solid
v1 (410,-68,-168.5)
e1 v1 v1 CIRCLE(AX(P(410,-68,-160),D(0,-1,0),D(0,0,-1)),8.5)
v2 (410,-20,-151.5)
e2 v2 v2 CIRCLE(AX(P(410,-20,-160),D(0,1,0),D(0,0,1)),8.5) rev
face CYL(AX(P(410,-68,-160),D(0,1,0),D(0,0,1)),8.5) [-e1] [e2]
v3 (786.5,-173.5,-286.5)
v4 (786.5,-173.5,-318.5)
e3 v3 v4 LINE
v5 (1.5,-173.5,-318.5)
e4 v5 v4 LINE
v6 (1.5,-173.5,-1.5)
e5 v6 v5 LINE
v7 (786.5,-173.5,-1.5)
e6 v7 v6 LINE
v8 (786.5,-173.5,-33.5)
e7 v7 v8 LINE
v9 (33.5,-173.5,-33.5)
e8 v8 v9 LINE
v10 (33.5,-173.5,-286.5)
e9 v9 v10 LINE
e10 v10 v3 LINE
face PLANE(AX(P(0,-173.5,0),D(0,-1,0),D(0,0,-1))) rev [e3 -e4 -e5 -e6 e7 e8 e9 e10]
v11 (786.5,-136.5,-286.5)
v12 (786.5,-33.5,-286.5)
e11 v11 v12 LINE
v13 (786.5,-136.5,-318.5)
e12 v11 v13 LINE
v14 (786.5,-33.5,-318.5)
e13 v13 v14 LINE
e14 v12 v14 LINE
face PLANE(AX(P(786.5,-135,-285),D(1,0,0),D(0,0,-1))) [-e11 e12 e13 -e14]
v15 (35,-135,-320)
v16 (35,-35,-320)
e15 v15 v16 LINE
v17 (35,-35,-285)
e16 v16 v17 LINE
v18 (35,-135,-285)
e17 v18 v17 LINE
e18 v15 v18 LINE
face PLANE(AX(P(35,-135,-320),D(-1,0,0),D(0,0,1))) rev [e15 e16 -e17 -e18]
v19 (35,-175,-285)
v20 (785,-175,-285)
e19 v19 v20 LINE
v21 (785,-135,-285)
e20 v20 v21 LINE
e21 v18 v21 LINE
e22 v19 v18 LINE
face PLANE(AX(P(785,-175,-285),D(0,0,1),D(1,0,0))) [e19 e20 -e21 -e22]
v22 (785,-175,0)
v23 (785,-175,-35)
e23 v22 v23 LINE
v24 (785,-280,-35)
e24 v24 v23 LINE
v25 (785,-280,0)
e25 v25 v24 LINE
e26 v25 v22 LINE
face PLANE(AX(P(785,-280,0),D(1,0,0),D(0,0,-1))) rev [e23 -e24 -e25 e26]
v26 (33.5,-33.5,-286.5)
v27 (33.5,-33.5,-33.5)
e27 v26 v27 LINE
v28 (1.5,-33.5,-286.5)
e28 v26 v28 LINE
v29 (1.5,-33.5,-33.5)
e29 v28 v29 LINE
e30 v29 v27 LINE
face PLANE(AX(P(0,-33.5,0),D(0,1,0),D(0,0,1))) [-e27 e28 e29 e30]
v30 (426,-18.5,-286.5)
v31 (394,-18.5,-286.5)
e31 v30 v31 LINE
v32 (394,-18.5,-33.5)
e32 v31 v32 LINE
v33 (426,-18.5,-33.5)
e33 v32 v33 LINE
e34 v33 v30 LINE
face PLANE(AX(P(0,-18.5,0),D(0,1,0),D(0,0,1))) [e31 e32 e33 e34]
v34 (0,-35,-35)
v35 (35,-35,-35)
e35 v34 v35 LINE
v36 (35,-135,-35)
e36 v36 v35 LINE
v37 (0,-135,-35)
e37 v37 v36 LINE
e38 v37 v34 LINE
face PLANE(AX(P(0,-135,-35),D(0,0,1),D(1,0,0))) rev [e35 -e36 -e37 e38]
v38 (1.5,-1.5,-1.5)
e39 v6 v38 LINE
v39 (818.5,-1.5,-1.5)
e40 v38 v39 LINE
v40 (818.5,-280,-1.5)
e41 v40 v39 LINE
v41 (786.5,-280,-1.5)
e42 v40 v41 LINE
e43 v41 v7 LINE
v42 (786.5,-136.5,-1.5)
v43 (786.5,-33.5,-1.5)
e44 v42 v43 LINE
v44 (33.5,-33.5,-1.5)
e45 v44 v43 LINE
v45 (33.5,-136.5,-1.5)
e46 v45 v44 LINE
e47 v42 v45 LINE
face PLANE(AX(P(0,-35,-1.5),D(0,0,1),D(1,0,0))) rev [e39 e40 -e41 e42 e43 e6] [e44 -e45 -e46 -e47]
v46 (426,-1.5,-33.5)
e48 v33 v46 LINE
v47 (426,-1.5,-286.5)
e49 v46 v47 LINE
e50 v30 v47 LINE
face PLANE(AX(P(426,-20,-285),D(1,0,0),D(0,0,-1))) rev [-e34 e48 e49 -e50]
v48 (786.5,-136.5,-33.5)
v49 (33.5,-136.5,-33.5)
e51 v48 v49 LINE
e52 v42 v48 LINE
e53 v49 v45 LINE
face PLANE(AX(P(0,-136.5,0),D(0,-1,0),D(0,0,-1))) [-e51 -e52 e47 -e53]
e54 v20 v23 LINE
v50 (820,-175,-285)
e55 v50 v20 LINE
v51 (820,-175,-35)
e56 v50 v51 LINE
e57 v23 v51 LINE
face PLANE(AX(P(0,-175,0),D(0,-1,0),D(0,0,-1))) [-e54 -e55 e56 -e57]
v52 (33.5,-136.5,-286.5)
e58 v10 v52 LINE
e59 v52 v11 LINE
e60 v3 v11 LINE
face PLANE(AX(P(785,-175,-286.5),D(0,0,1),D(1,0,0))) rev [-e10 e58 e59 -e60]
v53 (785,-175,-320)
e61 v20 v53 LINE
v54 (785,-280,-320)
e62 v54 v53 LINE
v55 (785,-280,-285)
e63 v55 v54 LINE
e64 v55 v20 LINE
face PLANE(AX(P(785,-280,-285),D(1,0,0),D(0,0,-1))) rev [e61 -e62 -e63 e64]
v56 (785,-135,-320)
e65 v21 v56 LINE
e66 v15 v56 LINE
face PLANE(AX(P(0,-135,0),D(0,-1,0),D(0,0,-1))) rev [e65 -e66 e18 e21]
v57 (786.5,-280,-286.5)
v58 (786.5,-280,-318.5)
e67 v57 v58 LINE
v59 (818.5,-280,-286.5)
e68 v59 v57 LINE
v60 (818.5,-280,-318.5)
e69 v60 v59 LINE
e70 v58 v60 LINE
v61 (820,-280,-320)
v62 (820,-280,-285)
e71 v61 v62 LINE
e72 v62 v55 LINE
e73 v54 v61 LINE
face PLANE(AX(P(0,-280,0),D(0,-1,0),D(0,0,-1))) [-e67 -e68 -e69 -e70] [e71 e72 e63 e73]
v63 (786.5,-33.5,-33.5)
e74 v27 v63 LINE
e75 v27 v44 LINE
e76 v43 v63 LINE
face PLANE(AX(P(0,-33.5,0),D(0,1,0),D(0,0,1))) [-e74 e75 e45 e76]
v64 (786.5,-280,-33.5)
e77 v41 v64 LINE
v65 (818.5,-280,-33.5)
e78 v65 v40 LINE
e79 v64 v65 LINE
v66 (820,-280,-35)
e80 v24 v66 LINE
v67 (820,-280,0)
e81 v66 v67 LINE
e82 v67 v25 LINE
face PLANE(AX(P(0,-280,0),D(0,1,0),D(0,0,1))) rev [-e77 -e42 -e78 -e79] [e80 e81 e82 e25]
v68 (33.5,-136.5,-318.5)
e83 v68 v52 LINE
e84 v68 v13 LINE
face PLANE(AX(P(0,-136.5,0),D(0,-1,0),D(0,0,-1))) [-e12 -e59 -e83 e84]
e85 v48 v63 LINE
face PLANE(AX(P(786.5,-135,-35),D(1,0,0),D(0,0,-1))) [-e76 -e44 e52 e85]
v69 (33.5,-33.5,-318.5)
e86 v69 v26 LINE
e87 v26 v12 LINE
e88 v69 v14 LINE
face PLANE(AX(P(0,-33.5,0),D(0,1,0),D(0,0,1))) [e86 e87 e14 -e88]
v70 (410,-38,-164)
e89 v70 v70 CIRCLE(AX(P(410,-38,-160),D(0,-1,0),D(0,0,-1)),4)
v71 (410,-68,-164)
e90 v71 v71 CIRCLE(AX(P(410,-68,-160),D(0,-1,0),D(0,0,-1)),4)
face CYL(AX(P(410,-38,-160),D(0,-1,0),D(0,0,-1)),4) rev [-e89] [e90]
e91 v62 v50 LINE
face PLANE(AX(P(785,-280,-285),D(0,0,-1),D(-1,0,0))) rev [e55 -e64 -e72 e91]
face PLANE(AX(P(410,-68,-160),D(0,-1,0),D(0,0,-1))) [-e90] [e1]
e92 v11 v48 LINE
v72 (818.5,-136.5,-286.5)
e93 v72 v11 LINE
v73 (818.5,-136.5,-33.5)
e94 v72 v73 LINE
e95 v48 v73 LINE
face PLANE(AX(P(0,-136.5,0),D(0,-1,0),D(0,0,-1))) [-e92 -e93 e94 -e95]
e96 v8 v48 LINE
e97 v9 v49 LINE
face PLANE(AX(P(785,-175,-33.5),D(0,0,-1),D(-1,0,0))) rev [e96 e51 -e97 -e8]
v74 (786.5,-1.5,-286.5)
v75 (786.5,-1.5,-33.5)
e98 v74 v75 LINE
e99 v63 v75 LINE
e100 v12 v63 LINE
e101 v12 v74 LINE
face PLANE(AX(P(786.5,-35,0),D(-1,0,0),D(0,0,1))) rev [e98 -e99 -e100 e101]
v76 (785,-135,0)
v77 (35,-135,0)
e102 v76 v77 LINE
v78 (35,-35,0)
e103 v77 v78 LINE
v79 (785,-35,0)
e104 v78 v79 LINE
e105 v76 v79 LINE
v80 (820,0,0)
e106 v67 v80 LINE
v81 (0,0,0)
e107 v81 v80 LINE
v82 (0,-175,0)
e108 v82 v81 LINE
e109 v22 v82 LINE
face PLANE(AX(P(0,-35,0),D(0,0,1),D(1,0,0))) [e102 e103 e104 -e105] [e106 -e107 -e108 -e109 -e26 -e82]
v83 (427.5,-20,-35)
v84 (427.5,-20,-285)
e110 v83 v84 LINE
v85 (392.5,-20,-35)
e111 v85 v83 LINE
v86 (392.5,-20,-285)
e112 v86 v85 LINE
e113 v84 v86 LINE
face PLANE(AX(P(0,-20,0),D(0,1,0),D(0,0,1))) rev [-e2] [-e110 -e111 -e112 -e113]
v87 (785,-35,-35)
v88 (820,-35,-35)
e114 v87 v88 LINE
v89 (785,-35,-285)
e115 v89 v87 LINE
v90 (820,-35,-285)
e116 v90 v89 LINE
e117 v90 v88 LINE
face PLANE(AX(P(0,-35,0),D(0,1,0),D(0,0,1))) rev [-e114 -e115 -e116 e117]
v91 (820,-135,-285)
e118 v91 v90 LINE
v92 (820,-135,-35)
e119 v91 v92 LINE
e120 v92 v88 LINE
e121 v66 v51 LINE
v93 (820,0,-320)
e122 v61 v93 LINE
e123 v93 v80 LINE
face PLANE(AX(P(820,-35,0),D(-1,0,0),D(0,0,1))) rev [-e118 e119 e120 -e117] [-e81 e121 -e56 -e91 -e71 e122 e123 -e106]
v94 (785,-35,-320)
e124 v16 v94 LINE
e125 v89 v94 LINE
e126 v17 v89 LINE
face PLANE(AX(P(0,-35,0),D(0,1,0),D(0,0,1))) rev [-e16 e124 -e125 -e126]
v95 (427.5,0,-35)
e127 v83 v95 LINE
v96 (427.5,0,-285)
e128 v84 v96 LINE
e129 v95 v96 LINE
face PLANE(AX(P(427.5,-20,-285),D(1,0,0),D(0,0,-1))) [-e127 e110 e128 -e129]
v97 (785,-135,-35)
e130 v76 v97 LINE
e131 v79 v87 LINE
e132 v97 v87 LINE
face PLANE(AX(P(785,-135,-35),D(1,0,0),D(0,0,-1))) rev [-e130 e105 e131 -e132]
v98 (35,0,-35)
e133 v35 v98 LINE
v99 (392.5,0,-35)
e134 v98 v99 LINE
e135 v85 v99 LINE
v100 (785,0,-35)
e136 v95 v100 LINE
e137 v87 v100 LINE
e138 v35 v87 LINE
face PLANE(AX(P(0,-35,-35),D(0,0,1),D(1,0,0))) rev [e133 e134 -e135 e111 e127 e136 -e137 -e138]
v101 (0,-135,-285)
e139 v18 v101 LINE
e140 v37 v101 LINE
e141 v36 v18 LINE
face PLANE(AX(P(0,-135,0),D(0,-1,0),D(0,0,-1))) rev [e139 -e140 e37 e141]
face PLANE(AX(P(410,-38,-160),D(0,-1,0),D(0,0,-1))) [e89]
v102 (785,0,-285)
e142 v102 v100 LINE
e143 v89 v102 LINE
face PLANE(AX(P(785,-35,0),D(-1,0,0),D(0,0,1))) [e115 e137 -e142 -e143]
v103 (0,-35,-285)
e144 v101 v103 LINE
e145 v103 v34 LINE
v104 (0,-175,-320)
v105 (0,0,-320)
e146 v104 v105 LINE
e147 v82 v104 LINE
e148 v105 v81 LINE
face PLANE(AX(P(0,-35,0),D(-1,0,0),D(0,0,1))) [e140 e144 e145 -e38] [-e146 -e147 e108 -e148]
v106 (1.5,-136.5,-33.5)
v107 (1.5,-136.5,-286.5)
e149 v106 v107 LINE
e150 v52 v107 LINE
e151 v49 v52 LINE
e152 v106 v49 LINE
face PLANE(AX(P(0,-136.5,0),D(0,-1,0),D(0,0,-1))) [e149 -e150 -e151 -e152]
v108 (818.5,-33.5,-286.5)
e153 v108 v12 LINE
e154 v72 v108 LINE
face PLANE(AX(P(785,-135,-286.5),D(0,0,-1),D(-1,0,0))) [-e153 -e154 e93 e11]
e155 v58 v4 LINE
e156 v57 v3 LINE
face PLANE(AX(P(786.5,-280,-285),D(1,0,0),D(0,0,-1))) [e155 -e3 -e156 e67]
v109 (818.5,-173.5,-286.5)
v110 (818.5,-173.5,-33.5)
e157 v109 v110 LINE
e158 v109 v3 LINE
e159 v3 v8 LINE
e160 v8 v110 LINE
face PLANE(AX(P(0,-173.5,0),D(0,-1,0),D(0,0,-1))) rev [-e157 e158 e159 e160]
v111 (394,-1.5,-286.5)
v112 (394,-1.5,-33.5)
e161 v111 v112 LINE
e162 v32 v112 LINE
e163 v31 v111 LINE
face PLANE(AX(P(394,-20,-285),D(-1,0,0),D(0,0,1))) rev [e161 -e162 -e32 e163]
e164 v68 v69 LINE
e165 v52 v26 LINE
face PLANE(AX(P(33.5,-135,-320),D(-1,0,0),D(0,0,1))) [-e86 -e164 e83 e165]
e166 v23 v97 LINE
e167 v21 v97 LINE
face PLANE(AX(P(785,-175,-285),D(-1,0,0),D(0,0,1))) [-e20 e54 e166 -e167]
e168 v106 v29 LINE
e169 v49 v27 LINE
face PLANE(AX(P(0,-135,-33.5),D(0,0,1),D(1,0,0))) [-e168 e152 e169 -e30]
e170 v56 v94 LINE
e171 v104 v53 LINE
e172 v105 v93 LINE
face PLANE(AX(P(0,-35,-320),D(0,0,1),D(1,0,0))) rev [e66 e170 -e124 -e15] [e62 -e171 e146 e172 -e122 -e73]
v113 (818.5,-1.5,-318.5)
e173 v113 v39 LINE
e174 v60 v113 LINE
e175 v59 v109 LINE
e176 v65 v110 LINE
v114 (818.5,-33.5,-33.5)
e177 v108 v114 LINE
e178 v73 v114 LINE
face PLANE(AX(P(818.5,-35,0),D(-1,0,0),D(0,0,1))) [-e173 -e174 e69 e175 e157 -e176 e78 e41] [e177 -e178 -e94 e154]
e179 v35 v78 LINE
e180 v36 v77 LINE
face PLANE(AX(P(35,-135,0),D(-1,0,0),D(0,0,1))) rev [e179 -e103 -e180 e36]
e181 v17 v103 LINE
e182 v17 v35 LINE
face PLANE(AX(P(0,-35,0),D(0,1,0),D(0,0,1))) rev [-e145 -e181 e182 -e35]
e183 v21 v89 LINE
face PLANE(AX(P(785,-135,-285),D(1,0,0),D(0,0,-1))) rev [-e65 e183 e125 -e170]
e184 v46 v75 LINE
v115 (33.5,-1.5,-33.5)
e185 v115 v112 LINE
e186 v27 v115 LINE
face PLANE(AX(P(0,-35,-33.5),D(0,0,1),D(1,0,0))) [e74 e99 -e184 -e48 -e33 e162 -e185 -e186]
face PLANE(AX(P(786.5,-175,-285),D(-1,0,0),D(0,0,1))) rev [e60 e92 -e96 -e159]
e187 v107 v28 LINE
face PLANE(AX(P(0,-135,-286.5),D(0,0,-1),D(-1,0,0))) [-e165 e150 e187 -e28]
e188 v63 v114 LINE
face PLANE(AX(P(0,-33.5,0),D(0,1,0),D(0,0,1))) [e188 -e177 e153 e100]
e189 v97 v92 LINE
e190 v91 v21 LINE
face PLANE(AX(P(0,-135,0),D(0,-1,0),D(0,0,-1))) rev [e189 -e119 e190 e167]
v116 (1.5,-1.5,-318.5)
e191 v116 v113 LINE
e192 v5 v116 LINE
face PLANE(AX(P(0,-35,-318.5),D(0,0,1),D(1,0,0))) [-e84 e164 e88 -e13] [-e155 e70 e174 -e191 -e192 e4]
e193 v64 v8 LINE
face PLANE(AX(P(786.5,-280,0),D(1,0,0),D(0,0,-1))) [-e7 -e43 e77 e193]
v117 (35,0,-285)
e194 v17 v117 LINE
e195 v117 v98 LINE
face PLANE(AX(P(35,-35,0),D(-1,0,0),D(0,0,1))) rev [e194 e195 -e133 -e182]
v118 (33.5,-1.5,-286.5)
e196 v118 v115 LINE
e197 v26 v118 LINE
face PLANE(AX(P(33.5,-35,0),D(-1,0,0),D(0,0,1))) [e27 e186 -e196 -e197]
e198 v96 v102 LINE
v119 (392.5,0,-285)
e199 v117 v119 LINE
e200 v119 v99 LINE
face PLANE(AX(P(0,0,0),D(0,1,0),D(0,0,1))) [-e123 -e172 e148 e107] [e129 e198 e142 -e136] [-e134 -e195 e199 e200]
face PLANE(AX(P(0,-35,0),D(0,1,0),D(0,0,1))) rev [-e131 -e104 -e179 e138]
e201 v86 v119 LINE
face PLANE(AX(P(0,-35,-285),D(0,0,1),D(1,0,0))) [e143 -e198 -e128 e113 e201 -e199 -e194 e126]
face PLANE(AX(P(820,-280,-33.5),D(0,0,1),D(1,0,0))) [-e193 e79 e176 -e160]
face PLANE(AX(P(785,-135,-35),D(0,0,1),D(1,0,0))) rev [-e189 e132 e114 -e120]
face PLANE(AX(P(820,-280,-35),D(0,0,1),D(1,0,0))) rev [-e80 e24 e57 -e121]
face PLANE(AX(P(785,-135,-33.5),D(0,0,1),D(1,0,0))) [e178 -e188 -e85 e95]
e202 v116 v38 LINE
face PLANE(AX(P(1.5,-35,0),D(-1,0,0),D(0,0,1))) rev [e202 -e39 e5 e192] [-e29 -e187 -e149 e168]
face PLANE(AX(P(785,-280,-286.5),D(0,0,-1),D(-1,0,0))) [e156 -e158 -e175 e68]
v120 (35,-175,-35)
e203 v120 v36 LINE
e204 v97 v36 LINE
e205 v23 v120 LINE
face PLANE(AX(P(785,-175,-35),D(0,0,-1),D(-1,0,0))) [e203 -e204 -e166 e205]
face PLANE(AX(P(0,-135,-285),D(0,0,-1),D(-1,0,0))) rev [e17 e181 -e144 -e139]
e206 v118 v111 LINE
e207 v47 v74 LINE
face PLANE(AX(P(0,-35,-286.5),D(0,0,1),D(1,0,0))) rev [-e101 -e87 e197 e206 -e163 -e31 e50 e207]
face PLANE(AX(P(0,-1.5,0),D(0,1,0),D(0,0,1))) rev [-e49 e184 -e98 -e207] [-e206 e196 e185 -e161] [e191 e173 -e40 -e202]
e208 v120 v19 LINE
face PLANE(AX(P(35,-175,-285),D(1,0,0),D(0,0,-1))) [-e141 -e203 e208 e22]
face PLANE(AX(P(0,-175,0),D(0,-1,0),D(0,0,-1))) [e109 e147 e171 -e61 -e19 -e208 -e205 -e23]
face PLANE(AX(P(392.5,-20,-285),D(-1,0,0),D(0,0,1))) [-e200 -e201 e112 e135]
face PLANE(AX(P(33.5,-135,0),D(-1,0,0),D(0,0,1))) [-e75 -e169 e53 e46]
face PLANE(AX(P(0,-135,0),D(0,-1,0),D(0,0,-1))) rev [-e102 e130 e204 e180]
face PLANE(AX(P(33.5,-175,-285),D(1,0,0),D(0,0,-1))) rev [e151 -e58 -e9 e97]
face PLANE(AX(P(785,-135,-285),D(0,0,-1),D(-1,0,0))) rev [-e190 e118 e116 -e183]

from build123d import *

# Parameters (mm, degrees)
SKETCH2_W            = 820
SKETCH2_H            = 320
SKETCH2_W_2          = 750
SKETCH2_H_2          = 250
BOSS_EXTRUDE1_DEPTH  = 35
SKETCH7_W            = 35
SKETCH7_H            = 250
BOSS_EXTRUDE6_DEPTH  = 20
SKETCH3_W            = 35
SKETCH3_H            = 35
BOSS_EXTRUDE2_DEPTH  = 100
SKETCH4_W            = 820
SKETCH4_H            = 320
SKETCH4_W_2          = 750
SKETCH4_H_2          = 250
BOSS_EXTRUDE3_DEPTH  = 40
SKETCH5_W            = 35
SKETCH5_H            = 35
BOSS_EXTRUDE4_DEPTH  = 105
SHELL1_START         = -173.5
SHELL1_OUTLINE_W     = 817
SHELL1_OUTLINE_H     = 317
SHELL1_OUTLINE_W_2   = 753
SHELL1_OUTLINE_H_2   = 253
SHELL1_DEPTH         = 37
SHELL1_START_2       = -33.5
SHELL1_2_OUTLINE_W   = 817
SHELL1_2_OUTLINE_H   = 317
SHELL1_2_OUTLINE_W_2 = 753
SHELL1_2_OUTLINE_H_2 = 253
SHELL1_2_DEPTH       = 32
SHELL1_START_3       = -280
SHELL1_3_OUTLINE_W   = 32
SHELL1_3_OUTLINE_H   = 32
SHELL1_3_DEPTH       = 246.5
SHELL1_START_4       = -136.5
SHELL1_4_OUTLINE_W   = 32
SHELL1_4_OUTLINE_H   = 32
SHELL1_4_DEPTH       = 103
SHELL1_START_5       = -18.5
SHELL1_5_OUTLINE_W   = 32
SHELL1_5_OUTLINE_H   = 253
SHELL1_5_DEPTH       = 17
BOSS_EXTRUDE5_START  = 20
SKETCH6_R            = 8.5
BOSS_EXTRUDE5_DEPTH  = 48
SKETCH8_R            = 4
CUT_EXTRUDE1_DEPTH   = 30


# Read off the part's stored shape, not the designer's step: Shell1
with BuildPart() as part:
    # Sketch2 → Boss-Extrude1 (new body)
    with BuildSketch(Plane(origin=(0, 0, 0), x_dir=(1, 0, 0), z_dir=(0, 1, 0))):
        with Locations((410, 160)):
            Rectangle(SKETCH2_W, SKETCH2_H)
        with Locations((410, 160)):
            Rectangle(SKETCH2_W_2, SKETCH2_H_2, mode=Mode.SUBTRACT)
    extrude(amount=-BOSS_EXTRUDE1_DEPTH)

    # Sketch7 → Boss-Extrude6 (add)
    with BuildSketch(Plane(origin=(0, 0, 0), x_dir=(1, 0, 0), z_dir=(0, 1, 0))):
        with Locations((410, 160)):
            Rectangle(SKETCH7_W, SKETCH7_H)
    extrude(amount=-BOSS_EXTRUDE6_DEPTH)

    # Sketch3 → Boss-Extrude2 (add)
    with BuildSketch(Plane(origin=(0, -35, 0), x_dir=(-1, 0, 0), z_dir=(0, -1, 0))):
        with Locations((-17.5, 17.5)):
            Rectangle(SKETCH3_W, SKETCH3_H)
        with Locations((-17.5, 302.5)):
            Rectangle(SKETCH3_W, SKETCH3_H)
        with Locations((-802.5, 302.5)):
            Rectangle(SKETCH3_W, SKETCH3_H)
        with Locations((-802.5, 17.5)):
            Rectangle(SKETCH3_W, SKETCH3_H)
    extrude(amount=BOSS_EXTRUDE2_DEPTH)

    # Sketch4 → Boss-Extrude3 (add)
    with BuildSketch(Plane.XZ.offset(135)):
        with Locations((410, -160)):
            Rectangle(SKETCH4_W, SKETCH4_H)
        with Locations((410, -160)):
            Rectangle(SKETCH4_W_2, SKETCH4_H_2, mode=Mode.SUBTRACT)
    extrude(amount=BOSS_EXTRUDE3_DEPTH)

    # Sketch5 → Boss-Extrude4 (add)
    with BuildSketch(Plane.XZ.offset(175)):
        with Locations((802.5, -17.5)):
            Rectangle(SKETCH5_W, SKETCH5_H)
        with Locations((802.5, -302.5)):
            Rectangle(SKETCH5_W, SKETCH5_H)
    extrude(amount=BOSS_EXTRUDE4_DEPTH)

    # Shell1 outline → Shell1 (cut)
    with BuildSketch(Plane(origin=(0, 0, 0), x_dir=(1, 0, 0), z_dir=(0, 1, 0)).offset(SHELL1_START)):
        with Locations((410, 160)):
            Rectangle(SHELL1_OUTLINE_W, SHELL1_OUTLINE_H)
        with Locations((410, 160)):
            Rectangle(SHELL1_OUTLINE_W_2, SHELL1_OUTLINE_H_2, mode=Mode.SUBTRACT)
    extrude(amount=SHELL1_DEPTH, mode=Mode.SUBTRACT)

    # Shell1 2 outline → Shell1 2 (cut)
    with BuildSketch(Plane(origin=(0, 0, 0), x_dir=(1, 0, 0), z_dir=(0, 1, 0)).offset(SHELL1_START_2)):
        with Locations((410, 160)):
            Rectangle(SHELL1_2_OUTLINE_W, SHELL1_2_OUTLINE_H)
        with Locations((410, 160)):
            Rectangle(SHELL1_2_OUTLINE_W_2, SHELL1_2_OUTLINE_H_2, mode=Mode.SUBTRACT)
    extrude(amount=SHELL1_2_DEPTH, mode=Mode.SUBTRACT)

    # Shell1 3 outline → Shell1 3 (cut)
    with BuildSketch(Plane(origin=(0, 0, 0), x_dir=(1, 0, 0), z_dir=(0, 1, 0)).offset(SHELL1_START_3)):
        with Locations((802.5, 302.5)):
            Rectangle(SHELL1_3_OUTLINE_W, SHELL1_3_OUTLINE_H)
        with Locations((802.5, 17.5)):
            Rectangle(SHELL1_3_OUTLINE_W, SHELL1_3_OUTLINE_H)
    extrude(amount=SHELL1_3_DEPTH, mode=Mode.SUBTRACT)

    # Shell1 4 outline → Shell1 4 (cut)
    with BuildSketch(Plane(origin=(0, 0, 0), x_dir=(1, 0, 0), z_dir=(0, 1, 0)).offset(SHELL1_START_4)):
        with Locations((17.5, 302.5)):
            Rectangle(SHELL1_4_OUTLINE_W, SHELL1_4_OUTLINE_H)
        with Locations((17.5, 17.5)):
            Rectangle(SHELL1_4_OUTLINE_W, SHELL1_4_OUTLINE_H)
    extrude(amount=SHELL1_4_DEPTH, mode=Mode.SUBTRACT)

    # Shell1 5 outline → Shell1 5 (cut)
    with BuildSketch(Plane(origin=(0, 0, 0), x_dir=(1, 0, 0), z_dir=(0, 1, 0)).offset(SHELL1_START_5)):
        with Locations((410, 160)):
            Rectangle(SHELL1_5_OUTLINE_W, SHELL1_5_OUTLINE_H)
    extrude(amount=SHELL1_5_DEPTH, mode=Mode.SUBTRACT)

    # Sketch6 → Boss-Extrude5 (add)
    with BuildSketch(Plane(origin=(0, 0, 0), x_dir=(-1, 0, 0), z_dir=(0, -1, 0)).offset(BOSS_EXTRUDE5_START)):
        with Locations(Location((-410, 160, 0), (0, 0, 270))):
            Circle(SKETCH6_R)
    extrude(amount=BOSS_EXTRUDE5_DEPTH)

    # Sketch8 → Cut-Extrude1 (cut)
    with BuildSketch(Plane.XZ.offset(68)):
        with Locations(Location((410, -160, 0), (0, 0, 270))):
            Circle(SKETCH8_R)
    extrude(amount=-CUT_EXTRUDE1_DEPTH, mode=Mode.SUBTRACT)


solid = part.part
